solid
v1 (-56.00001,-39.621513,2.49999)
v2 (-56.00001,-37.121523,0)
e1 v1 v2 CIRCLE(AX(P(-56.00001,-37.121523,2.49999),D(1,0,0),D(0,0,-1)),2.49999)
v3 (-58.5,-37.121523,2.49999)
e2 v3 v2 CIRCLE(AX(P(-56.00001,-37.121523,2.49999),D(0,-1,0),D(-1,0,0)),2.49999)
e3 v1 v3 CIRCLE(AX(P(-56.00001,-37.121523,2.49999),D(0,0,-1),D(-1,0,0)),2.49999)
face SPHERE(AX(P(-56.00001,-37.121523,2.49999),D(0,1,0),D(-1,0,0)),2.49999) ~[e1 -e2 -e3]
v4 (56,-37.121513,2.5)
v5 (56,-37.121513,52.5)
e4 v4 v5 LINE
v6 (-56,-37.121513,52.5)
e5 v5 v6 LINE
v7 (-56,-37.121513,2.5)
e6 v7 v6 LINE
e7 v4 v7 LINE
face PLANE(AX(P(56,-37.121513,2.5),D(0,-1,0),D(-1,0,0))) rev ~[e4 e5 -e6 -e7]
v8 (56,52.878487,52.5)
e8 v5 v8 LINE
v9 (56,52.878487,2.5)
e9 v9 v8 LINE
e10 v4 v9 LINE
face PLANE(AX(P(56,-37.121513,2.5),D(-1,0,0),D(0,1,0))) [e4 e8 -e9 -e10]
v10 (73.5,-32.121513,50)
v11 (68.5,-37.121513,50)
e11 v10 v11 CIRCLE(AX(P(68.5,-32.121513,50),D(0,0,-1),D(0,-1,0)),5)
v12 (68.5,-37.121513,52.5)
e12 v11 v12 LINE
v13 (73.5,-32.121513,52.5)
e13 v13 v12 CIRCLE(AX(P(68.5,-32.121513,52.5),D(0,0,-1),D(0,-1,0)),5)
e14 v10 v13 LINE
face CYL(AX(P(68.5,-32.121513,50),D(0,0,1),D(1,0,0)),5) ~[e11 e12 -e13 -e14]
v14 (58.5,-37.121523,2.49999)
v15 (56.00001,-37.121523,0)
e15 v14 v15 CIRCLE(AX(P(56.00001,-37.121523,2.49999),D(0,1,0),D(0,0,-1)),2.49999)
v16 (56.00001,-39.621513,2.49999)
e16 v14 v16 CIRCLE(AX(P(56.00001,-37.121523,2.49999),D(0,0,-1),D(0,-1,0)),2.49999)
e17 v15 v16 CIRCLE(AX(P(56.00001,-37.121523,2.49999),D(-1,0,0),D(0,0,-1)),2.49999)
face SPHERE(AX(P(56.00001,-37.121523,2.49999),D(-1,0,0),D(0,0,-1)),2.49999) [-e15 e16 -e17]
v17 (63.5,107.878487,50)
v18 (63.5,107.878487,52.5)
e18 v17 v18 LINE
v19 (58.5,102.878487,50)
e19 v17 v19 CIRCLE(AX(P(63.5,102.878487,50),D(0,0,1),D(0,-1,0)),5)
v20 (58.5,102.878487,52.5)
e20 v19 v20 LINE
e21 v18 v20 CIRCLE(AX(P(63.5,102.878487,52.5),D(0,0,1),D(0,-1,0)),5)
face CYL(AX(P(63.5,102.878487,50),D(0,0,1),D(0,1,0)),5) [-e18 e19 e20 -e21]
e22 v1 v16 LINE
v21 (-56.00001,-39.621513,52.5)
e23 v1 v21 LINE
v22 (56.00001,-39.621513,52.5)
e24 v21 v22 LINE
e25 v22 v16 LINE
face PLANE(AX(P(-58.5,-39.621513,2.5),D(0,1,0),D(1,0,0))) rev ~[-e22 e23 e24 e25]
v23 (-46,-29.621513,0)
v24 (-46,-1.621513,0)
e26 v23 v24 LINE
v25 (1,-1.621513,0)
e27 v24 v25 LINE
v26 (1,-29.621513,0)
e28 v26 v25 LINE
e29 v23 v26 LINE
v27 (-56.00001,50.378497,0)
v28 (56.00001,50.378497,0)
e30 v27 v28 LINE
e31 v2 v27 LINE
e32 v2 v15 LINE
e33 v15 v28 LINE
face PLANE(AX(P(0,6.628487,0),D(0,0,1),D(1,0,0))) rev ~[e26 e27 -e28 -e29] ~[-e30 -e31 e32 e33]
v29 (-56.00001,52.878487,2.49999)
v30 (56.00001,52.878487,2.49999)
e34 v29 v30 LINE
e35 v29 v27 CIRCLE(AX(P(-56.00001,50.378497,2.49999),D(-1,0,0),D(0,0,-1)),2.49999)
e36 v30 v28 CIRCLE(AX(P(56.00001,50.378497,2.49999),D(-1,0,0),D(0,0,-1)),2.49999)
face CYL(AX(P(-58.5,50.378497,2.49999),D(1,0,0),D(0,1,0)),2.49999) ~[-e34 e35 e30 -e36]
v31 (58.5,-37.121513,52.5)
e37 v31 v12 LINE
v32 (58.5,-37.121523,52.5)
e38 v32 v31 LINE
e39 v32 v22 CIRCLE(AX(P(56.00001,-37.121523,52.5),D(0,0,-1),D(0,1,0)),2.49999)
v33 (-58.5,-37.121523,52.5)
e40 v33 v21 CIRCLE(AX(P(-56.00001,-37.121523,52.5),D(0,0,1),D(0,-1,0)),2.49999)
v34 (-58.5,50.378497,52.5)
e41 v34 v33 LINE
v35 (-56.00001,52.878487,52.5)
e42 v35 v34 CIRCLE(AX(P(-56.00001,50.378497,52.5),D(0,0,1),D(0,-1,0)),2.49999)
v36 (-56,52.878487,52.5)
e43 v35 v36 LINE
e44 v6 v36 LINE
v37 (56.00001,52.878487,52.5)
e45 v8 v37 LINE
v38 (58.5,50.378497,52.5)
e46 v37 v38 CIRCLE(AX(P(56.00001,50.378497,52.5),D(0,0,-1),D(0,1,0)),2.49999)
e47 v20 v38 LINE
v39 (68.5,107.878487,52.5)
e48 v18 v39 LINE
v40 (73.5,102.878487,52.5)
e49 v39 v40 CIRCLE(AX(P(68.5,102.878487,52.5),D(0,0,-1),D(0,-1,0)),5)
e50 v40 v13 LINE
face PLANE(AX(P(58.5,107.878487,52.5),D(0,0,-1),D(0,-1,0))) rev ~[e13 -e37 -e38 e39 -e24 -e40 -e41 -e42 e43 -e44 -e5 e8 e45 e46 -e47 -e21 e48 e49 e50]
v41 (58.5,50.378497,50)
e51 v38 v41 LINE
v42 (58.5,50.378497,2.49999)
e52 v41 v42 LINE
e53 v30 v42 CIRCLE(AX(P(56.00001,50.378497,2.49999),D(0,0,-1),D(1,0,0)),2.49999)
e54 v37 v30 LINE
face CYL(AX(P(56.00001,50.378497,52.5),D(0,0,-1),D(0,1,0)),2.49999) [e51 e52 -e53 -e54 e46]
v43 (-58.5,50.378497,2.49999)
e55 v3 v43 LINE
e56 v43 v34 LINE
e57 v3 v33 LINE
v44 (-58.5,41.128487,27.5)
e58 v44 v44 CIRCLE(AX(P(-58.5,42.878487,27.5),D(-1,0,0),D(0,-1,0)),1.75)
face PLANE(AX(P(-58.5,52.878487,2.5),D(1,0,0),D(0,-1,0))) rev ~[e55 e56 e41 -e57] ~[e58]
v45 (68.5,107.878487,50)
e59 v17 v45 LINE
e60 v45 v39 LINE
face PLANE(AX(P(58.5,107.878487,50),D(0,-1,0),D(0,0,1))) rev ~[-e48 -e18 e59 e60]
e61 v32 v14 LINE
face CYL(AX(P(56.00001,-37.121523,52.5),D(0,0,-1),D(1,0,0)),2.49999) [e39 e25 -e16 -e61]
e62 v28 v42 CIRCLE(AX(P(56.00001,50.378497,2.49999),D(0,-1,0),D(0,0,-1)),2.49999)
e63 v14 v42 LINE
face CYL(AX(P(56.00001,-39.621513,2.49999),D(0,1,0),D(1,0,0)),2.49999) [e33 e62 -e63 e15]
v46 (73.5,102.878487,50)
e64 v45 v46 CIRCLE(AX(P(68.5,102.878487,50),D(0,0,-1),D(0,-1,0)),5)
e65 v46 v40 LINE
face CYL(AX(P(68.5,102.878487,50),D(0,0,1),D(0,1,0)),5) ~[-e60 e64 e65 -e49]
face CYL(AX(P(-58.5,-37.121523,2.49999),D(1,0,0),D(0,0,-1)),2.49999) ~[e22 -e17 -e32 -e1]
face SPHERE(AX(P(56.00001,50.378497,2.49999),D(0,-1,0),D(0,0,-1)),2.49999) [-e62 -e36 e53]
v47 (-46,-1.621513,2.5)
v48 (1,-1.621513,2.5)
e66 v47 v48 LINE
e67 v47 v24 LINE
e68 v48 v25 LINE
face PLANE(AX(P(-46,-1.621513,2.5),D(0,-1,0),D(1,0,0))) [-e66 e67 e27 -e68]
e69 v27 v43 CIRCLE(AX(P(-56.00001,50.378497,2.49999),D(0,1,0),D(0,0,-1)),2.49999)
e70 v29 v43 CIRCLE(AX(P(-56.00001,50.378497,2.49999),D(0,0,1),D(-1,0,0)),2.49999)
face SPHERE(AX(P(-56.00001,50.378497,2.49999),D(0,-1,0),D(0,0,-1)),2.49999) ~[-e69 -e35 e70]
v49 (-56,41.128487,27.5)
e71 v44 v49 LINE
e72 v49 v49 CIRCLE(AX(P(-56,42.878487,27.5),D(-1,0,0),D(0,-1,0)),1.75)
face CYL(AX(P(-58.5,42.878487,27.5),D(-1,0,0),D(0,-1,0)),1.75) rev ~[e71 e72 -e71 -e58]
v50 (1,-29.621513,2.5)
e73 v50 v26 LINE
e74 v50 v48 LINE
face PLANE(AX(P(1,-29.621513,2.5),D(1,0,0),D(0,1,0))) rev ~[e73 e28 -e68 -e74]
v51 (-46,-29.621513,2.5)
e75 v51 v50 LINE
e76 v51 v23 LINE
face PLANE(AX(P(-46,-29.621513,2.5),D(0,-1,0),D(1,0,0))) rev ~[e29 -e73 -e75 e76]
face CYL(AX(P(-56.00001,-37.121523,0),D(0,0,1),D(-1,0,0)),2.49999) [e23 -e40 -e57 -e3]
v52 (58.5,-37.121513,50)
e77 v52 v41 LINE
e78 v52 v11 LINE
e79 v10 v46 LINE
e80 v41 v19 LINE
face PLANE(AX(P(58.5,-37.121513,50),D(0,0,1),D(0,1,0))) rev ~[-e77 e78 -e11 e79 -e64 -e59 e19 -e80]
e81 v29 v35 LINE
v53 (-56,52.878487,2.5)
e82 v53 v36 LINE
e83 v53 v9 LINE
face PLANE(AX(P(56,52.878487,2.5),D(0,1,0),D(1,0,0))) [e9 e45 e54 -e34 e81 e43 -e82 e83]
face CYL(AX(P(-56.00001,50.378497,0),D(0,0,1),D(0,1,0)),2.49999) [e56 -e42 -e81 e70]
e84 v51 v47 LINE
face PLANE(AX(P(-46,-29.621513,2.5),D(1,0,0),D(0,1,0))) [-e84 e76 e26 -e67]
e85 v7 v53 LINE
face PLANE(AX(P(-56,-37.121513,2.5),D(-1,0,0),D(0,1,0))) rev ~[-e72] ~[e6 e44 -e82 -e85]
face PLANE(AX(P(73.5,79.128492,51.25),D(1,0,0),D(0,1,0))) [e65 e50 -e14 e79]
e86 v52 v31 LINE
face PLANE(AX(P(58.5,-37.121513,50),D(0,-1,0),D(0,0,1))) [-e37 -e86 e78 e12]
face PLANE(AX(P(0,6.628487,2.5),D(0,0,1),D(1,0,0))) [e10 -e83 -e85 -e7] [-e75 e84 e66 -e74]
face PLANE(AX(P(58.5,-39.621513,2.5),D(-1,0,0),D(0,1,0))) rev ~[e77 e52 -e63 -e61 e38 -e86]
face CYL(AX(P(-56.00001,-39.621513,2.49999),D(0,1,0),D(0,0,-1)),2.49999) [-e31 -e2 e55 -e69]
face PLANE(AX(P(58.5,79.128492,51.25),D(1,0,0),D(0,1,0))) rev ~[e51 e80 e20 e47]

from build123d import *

# Parameters (mm, degrees)
F0_W     = 117
F0_H     = 92.5
F1_DEPTH = 2.5
F2_W     = 2.5
F2_H     = 90
F3_DEPTH = 50
F2_W_2   = 47
F2_H_2   = 28
F4_DEPTH = 25
F5_R     = 1.75
F6_DEPTH = 25
F7_R     = 2.49999
F8_W     = 57.49999
F8_H     = 2.5
F8_W_2   = 87.50001
F9_DEPTH = 15
F10_R    = 5


# Not quite as in the source:
# - a fillet or chamfer is up to 0.001 mm smaller than in the source, because OpenCascade refuses the exact size


with BuildPart() as f1:
    # F0 (on Top) → F1 (new body)
    with BuildSketch(Plane.XY):
        with Locations((0, 6.6284866768)):
            Rectangle(F0_W, F0_H)
    extrude(amount=F1_DEPTH)

    # F2 (on face) → F3 (join)
    with BuildSketch(Plane.XY.offset(2.5)):
        with Locations((57.25, 7.8784866768)):
            Rectangle(F2_W, F2_H)
        Polygon((-58.5, -37.1215133232), (-58.5, -39.6215133232), (58.5, -39.6215133232), (58.5, -37.1215133232), (56, -37.1215133232), (-56, -37.1215133232), align=None)
        with Locations((-57.25, 7.8784866768)):
            Rectangle(F2_W, F2_H)
    extrude(amount=F3_DEPTH)

    # F2 (on face) → F4 (cut)
    with BuildSketch(Plane.XY.offset(2.5)):
        with Locations((-22.5, -15.6215133232)):
            Rectangle(F2_W_2, F2_H_2)
    extrude(amount=-F4_DEPTH, mode=Mode.SUBTRACT)

    # F5 (on face) → F6 (cut)
    with BuildSketch(Plane(origin=(-58.5, 0, 0), x_dir=(0, -1, 0), z_dir=(-1, 0, 0))):
        with Locations((-42.8784866768, 27.5)):
            Circle(F5_R)
    extrude(amount=-F6_DEPTH, mode=Mode.SUBTRACT)

    # F7 (radius 2.5 in the source; OpenCascade refuses exactly that, so slightly less here)
    f7_edges = [f1.edges().sort_by_distance(p)[0] for p in [
        (-58.5, 6.628487, 0),
        (-58.5, -39.621513, 26.25),
        (0, -39.621513, 0),
        (58.5, 6.628487, 0),
        (58.5, -39.621513, 26.25),
        (0, 52.878487, 0),
        (-58.5, 52.878487, 26.25),
        (58.5, 52.878487, 26.25),
    ]]
    fillet(f7_edges, radius=F7_R)

    # F8 (on face) → F9 (join)
    with BuildSketch(Plane.YZ.offset(58.5)):
        with Locations((79.1284916768, 51.25)):
            Rectangle(F8_W, F8_H)
        with Locations((6.6284916768, 51.25)):
            Rectangle(F8_W_2, F8_H)
    extrude(amount=F9_DEPTH)

    # F10
    f10_edges = [f1.edges().sort_by_distance(p)[0] for p in [
        (73.5, 107.878487, 51.25),
        (58.5, 107.878487, 51.25),
        (73.5, -37.121513, 51.25),
    ]]
    fillet(f10_edges, radius=F10_R)


solid = f1.part
